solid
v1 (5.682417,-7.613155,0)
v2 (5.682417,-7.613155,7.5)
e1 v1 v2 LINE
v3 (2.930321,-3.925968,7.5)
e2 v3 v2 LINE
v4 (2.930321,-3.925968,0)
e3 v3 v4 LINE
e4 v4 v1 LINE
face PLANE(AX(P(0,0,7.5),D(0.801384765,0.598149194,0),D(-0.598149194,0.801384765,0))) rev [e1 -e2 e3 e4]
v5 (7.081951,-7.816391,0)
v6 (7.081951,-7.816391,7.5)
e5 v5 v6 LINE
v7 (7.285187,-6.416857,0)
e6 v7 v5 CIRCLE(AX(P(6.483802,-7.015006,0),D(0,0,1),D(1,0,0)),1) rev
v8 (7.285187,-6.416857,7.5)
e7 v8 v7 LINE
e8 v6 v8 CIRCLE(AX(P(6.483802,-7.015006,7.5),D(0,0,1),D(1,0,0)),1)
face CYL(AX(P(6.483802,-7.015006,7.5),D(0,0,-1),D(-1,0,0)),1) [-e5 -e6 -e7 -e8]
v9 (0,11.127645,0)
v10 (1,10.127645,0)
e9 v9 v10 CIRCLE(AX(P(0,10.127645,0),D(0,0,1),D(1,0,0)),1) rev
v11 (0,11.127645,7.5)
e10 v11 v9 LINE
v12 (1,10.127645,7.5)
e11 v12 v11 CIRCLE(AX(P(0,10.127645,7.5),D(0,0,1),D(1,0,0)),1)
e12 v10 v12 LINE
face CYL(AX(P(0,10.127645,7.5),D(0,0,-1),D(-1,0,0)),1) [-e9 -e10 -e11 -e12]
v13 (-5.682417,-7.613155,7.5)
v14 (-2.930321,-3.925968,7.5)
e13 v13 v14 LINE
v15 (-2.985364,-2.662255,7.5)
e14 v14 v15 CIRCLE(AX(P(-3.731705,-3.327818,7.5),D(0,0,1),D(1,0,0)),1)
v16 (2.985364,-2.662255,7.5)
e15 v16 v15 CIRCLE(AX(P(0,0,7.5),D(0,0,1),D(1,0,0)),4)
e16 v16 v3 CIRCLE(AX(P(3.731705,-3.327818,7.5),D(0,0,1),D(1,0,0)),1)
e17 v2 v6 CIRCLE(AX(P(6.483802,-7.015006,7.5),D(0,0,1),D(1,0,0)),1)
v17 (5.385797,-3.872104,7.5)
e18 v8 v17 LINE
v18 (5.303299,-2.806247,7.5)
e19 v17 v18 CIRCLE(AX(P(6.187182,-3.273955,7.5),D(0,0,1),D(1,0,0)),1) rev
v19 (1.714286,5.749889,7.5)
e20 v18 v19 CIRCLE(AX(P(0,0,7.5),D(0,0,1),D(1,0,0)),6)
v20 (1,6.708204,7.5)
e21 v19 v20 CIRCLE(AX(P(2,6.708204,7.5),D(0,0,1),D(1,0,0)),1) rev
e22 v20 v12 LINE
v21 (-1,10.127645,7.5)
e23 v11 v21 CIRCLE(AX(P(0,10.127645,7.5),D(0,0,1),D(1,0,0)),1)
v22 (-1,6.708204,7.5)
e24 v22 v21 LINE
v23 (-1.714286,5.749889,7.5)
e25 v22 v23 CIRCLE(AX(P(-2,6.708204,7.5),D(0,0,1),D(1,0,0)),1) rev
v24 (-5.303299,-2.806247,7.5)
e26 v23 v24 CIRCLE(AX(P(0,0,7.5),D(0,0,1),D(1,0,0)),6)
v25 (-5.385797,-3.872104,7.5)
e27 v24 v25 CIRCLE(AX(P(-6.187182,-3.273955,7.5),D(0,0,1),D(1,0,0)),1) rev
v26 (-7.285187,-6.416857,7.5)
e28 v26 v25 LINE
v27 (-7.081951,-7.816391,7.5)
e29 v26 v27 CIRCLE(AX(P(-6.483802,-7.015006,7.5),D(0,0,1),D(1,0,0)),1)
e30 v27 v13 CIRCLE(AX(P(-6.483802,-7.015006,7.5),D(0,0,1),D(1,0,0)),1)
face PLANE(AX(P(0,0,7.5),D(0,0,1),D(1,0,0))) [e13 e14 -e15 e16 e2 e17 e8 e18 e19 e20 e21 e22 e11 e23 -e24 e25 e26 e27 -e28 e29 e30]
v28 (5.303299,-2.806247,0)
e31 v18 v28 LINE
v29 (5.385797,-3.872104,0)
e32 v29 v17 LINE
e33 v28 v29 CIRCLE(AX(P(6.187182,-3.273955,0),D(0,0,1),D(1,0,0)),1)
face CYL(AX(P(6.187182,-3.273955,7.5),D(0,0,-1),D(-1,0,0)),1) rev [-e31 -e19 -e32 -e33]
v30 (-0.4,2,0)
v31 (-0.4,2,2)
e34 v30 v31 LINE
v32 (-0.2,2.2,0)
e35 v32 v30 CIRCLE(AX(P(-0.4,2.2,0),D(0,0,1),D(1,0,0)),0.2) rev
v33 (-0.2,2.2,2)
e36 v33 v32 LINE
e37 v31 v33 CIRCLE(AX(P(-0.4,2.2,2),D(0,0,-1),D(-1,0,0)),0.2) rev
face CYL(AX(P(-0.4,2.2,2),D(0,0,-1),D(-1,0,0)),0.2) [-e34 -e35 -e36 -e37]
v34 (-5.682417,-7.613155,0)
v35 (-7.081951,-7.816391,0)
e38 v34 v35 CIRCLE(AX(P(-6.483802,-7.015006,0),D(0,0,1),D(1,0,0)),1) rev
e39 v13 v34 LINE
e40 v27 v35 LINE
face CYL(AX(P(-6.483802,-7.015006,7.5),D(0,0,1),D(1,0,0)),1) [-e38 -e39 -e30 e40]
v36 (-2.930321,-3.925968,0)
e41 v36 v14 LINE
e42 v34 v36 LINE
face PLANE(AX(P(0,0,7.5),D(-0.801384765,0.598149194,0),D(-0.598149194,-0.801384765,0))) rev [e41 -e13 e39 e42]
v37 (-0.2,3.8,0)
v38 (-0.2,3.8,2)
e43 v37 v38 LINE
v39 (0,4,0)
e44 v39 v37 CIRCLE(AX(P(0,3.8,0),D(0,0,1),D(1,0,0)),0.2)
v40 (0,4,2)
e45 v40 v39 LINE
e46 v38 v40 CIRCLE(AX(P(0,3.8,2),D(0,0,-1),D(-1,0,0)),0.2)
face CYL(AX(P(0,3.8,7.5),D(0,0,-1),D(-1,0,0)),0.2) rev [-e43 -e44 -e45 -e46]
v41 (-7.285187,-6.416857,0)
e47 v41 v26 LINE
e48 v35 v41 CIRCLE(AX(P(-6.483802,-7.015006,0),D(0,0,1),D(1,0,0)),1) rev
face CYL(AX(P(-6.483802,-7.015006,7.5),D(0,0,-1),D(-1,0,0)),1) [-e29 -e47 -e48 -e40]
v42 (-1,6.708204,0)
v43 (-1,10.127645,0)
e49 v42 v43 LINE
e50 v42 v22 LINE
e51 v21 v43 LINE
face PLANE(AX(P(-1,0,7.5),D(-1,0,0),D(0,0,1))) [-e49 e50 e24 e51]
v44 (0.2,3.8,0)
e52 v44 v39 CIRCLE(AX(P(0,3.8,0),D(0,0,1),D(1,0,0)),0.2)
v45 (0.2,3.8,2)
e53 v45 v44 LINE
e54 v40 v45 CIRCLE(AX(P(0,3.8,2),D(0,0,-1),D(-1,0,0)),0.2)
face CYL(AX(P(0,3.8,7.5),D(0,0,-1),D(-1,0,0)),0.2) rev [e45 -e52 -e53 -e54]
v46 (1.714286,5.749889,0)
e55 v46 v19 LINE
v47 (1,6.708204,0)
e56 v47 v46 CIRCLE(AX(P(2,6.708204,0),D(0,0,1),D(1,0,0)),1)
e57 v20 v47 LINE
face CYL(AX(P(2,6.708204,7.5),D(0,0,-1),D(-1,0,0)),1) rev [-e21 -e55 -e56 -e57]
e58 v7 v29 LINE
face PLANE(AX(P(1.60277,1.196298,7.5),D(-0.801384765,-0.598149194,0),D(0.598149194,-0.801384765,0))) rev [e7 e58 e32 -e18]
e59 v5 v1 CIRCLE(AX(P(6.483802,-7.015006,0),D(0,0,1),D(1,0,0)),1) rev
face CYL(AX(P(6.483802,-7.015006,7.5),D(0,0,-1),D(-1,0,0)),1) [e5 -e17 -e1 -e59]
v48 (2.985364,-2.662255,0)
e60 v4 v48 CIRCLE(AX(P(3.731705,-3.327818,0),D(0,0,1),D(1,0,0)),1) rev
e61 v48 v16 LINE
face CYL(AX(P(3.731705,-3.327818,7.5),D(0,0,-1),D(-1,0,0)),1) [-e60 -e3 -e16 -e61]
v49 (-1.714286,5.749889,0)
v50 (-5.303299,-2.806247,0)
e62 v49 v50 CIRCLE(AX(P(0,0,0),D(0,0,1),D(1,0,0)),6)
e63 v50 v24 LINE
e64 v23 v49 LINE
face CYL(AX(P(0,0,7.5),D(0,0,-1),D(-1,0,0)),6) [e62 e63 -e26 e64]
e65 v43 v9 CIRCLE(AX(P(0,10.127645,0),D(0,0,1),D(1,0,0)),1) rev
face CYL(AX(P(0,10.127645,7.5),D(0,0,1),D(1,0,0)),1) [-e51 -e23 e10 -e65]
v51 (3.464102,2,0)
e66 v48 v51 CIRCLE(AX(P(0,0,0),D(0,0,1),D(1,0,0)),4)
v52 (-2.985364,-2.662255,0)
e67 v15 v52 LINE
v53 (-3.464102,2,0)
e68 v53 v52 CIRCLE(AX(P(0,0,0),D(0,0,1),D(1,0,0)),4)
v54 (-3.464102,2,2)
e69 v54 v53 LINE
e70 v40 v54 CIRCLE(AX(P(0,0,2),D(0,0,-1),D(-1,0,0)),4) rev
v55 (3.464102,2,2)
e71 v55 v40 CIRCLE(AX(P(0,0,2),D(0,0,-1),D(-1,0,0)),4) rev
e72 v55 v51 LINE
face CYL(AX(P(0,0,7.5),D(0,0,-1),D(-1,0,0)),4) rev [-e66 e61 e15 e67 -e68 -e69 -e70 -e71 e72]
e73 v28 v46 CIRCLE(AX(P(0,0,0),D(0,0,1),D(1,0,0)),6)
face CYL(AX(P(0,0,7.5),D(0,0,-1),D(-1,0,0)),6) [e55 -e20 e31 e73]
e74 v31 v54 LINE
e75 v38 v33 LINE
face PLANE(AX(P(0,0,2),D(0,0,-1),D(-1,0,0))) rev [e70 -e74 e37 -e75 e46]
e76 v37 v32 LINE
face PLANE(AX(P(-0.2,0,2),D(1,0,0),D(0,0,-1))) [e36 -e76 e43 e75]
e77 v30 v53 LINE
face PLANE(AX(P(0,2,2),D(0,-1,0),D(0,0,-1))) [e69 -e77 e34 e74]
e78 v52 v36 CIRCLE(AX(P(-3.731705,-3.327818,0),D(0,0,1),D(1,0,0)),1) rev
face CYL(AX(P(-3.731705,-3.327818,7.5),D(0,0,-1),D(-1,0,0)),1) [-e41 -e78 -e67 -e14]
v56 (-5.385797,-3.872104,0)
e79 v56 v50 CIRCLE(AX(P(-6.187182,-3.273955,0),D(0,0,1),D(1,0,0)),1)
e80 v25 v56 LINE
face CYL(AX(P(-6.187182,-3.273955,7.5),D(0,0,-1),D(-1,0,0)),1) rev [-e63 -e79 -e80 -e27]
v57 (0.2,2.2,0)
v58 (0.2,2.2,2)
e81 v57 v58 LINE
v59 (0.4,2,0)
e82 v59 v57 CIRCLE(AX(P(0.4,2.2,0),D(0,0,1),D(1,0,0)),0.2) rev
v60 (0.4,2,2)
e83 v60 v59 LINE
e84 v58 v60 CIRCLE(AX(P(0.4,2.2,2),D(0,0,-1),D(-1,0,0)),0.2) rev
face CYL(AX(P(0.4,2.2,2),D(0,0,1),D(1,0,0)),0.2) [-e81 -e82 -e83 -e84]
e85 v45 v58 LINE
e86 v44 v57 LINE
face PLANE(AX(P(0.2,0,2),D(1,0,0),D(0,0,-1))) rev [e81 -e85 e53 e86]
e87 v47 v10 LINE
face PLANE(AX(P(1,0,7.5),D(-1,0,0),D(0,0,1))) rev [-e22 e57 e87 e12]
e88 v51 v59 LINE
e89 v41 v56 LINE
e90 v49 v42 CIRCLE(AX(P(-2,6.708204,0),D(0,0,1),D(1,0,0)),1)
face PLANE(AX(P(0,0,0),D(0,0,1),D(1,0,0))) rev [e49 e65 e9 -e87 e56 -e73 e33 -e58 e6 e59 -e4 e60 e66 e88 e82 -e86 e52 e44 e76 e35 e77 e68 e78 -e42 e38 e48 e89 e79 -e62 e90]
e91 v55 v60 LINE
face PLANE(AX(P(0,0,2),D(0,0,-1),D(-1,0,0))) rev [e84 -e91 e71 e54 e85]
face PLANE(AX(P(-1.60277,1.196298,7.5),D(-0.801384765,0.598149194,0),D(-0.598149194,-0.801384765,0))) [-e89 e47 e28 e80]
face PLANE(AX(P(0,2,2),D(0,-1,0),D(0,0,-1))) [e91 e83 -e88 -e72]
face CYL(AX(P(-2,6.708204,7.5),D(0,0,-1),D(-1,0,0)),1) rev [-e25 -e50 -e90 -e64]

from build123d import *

# Parameters (mm, degrees)
BOSS_EXTRUDE1_DEPTH = 7.5
FILLET1_R           = 1
BOSS_EXTRUDE2_DEPTH = 2
FILLET2_R           = 0.2


with BuildPart() as part:
    # Sketch1 → Boss-Extrude1 (new body)
    with BuildSketch(Plane.XY):
        with BuildLine():
            Line((2.392596776, -3.20553906), (6.280566538, -8.414540033))
            Line((6.280566538, -8.414540033), (7.883336068, -7.218241645))
            Line((7.883336068, -7.218241645), (4.98641234, -3.337018425))
            ThreePointArc((4.98641234, -3.337018425), (5.510375649, 2.373975613), (1, 5.916079783))
            Line((1, 5.916079783), (1, 11.127644916))
            Line((1, 11.127644916), (-1, 11.127644916))
            Line((-1, 11.127644916), (-1, 5.916079783))
            ThreePointArc((-1, 5.916079783), (-5.510375649, 2.373975613), (-4.98641234, -3.337018425))
            Line((-4.98641234, -3.337018425), (-7.883336068, -7.218241645))
            Line((-7.883336068, -7.218241645), (-6.280566538, -8.414540033))
            Line((-6.280566538, -8.414540033), (-2.392596776, -3.20553906))
            ThreePointArc((-2.392596776, -3.20553906), (0, 4), (2.392596776, -3.20553906))
        make_face()
    extrude(amount=BOSS_EXTRUDE1_DEPTH)

    # Fillet1
    fillet1_edges = [part.edges().sort_by_distance(p)[0] for p in [
        (6.280566538, -8.414540033, 3.75),
        (7.883336068, -7.218241645, 3.75),
        (-6.280566538, -8.414540033, 3.75),
        (-7.883336068, -7.218241645, 3.75),
        (-4.98641234, -3.337018425, 3.75),
        (2.392596776, -3.20553906, 3.75),
        (-2.392596776, -3.20553906, 3.75),
        (4.98641234, -3.337018425, 3.75),
        (-1, 5.916079783, 3.75),
        (-1, 11.127644916, 3.75),
        (1, 11.127644916, 3.75),
        (1, 5.916079783, 3.75),
    ]]
    fillet(fillet1_edges, radius=FILLET1_R - 0.0001)  # a hair under: the kernel refuses the full size

    # Sketch2 → Boss-Extrude2 (add)
    with BuildSketch(Plane(origin=(0, 0, 0), x_dir=(-1, 0, 0), z_dir=(0, 0, -1))):
        with BuildLine():
            ThreePointArc((-0.2, 3.994996871), (-2.086004144, 3.413002594), (-3.464101615, 2))
            Line((-3.464101615, 2), (-0.2, 2))
            Line((-0.2, 2), (-0.2, 3.994996871))
        make_face()
        with BuildLine():
            Line((0.2, 3.994996871), (0.2, 2))
            Line((0.2, 2), (3.464101615, 2))
            ThreePointArc((3.464101615, 2), (2.086004144, 3.413002594), (0.2, 3.994996871))
        make_face()
    extrude(amount=-BOSS_EXTRUDE2_DEPTH)

    # Fillet2
    fillet2_edges = [part.edges().sort_by_distance(p)[0] for p in [
        (0.2, 3.994996871, 1),
        (-0.2, 3.994996871, 1),
        (-0.2, 2, 1),
        (0.2, 2, 1),
    ]]
    fillet(fillet2_edges, radius=FILLET2_R - 0.0001)  # a hair under: the kernel refuses the full size


solid = part.part
